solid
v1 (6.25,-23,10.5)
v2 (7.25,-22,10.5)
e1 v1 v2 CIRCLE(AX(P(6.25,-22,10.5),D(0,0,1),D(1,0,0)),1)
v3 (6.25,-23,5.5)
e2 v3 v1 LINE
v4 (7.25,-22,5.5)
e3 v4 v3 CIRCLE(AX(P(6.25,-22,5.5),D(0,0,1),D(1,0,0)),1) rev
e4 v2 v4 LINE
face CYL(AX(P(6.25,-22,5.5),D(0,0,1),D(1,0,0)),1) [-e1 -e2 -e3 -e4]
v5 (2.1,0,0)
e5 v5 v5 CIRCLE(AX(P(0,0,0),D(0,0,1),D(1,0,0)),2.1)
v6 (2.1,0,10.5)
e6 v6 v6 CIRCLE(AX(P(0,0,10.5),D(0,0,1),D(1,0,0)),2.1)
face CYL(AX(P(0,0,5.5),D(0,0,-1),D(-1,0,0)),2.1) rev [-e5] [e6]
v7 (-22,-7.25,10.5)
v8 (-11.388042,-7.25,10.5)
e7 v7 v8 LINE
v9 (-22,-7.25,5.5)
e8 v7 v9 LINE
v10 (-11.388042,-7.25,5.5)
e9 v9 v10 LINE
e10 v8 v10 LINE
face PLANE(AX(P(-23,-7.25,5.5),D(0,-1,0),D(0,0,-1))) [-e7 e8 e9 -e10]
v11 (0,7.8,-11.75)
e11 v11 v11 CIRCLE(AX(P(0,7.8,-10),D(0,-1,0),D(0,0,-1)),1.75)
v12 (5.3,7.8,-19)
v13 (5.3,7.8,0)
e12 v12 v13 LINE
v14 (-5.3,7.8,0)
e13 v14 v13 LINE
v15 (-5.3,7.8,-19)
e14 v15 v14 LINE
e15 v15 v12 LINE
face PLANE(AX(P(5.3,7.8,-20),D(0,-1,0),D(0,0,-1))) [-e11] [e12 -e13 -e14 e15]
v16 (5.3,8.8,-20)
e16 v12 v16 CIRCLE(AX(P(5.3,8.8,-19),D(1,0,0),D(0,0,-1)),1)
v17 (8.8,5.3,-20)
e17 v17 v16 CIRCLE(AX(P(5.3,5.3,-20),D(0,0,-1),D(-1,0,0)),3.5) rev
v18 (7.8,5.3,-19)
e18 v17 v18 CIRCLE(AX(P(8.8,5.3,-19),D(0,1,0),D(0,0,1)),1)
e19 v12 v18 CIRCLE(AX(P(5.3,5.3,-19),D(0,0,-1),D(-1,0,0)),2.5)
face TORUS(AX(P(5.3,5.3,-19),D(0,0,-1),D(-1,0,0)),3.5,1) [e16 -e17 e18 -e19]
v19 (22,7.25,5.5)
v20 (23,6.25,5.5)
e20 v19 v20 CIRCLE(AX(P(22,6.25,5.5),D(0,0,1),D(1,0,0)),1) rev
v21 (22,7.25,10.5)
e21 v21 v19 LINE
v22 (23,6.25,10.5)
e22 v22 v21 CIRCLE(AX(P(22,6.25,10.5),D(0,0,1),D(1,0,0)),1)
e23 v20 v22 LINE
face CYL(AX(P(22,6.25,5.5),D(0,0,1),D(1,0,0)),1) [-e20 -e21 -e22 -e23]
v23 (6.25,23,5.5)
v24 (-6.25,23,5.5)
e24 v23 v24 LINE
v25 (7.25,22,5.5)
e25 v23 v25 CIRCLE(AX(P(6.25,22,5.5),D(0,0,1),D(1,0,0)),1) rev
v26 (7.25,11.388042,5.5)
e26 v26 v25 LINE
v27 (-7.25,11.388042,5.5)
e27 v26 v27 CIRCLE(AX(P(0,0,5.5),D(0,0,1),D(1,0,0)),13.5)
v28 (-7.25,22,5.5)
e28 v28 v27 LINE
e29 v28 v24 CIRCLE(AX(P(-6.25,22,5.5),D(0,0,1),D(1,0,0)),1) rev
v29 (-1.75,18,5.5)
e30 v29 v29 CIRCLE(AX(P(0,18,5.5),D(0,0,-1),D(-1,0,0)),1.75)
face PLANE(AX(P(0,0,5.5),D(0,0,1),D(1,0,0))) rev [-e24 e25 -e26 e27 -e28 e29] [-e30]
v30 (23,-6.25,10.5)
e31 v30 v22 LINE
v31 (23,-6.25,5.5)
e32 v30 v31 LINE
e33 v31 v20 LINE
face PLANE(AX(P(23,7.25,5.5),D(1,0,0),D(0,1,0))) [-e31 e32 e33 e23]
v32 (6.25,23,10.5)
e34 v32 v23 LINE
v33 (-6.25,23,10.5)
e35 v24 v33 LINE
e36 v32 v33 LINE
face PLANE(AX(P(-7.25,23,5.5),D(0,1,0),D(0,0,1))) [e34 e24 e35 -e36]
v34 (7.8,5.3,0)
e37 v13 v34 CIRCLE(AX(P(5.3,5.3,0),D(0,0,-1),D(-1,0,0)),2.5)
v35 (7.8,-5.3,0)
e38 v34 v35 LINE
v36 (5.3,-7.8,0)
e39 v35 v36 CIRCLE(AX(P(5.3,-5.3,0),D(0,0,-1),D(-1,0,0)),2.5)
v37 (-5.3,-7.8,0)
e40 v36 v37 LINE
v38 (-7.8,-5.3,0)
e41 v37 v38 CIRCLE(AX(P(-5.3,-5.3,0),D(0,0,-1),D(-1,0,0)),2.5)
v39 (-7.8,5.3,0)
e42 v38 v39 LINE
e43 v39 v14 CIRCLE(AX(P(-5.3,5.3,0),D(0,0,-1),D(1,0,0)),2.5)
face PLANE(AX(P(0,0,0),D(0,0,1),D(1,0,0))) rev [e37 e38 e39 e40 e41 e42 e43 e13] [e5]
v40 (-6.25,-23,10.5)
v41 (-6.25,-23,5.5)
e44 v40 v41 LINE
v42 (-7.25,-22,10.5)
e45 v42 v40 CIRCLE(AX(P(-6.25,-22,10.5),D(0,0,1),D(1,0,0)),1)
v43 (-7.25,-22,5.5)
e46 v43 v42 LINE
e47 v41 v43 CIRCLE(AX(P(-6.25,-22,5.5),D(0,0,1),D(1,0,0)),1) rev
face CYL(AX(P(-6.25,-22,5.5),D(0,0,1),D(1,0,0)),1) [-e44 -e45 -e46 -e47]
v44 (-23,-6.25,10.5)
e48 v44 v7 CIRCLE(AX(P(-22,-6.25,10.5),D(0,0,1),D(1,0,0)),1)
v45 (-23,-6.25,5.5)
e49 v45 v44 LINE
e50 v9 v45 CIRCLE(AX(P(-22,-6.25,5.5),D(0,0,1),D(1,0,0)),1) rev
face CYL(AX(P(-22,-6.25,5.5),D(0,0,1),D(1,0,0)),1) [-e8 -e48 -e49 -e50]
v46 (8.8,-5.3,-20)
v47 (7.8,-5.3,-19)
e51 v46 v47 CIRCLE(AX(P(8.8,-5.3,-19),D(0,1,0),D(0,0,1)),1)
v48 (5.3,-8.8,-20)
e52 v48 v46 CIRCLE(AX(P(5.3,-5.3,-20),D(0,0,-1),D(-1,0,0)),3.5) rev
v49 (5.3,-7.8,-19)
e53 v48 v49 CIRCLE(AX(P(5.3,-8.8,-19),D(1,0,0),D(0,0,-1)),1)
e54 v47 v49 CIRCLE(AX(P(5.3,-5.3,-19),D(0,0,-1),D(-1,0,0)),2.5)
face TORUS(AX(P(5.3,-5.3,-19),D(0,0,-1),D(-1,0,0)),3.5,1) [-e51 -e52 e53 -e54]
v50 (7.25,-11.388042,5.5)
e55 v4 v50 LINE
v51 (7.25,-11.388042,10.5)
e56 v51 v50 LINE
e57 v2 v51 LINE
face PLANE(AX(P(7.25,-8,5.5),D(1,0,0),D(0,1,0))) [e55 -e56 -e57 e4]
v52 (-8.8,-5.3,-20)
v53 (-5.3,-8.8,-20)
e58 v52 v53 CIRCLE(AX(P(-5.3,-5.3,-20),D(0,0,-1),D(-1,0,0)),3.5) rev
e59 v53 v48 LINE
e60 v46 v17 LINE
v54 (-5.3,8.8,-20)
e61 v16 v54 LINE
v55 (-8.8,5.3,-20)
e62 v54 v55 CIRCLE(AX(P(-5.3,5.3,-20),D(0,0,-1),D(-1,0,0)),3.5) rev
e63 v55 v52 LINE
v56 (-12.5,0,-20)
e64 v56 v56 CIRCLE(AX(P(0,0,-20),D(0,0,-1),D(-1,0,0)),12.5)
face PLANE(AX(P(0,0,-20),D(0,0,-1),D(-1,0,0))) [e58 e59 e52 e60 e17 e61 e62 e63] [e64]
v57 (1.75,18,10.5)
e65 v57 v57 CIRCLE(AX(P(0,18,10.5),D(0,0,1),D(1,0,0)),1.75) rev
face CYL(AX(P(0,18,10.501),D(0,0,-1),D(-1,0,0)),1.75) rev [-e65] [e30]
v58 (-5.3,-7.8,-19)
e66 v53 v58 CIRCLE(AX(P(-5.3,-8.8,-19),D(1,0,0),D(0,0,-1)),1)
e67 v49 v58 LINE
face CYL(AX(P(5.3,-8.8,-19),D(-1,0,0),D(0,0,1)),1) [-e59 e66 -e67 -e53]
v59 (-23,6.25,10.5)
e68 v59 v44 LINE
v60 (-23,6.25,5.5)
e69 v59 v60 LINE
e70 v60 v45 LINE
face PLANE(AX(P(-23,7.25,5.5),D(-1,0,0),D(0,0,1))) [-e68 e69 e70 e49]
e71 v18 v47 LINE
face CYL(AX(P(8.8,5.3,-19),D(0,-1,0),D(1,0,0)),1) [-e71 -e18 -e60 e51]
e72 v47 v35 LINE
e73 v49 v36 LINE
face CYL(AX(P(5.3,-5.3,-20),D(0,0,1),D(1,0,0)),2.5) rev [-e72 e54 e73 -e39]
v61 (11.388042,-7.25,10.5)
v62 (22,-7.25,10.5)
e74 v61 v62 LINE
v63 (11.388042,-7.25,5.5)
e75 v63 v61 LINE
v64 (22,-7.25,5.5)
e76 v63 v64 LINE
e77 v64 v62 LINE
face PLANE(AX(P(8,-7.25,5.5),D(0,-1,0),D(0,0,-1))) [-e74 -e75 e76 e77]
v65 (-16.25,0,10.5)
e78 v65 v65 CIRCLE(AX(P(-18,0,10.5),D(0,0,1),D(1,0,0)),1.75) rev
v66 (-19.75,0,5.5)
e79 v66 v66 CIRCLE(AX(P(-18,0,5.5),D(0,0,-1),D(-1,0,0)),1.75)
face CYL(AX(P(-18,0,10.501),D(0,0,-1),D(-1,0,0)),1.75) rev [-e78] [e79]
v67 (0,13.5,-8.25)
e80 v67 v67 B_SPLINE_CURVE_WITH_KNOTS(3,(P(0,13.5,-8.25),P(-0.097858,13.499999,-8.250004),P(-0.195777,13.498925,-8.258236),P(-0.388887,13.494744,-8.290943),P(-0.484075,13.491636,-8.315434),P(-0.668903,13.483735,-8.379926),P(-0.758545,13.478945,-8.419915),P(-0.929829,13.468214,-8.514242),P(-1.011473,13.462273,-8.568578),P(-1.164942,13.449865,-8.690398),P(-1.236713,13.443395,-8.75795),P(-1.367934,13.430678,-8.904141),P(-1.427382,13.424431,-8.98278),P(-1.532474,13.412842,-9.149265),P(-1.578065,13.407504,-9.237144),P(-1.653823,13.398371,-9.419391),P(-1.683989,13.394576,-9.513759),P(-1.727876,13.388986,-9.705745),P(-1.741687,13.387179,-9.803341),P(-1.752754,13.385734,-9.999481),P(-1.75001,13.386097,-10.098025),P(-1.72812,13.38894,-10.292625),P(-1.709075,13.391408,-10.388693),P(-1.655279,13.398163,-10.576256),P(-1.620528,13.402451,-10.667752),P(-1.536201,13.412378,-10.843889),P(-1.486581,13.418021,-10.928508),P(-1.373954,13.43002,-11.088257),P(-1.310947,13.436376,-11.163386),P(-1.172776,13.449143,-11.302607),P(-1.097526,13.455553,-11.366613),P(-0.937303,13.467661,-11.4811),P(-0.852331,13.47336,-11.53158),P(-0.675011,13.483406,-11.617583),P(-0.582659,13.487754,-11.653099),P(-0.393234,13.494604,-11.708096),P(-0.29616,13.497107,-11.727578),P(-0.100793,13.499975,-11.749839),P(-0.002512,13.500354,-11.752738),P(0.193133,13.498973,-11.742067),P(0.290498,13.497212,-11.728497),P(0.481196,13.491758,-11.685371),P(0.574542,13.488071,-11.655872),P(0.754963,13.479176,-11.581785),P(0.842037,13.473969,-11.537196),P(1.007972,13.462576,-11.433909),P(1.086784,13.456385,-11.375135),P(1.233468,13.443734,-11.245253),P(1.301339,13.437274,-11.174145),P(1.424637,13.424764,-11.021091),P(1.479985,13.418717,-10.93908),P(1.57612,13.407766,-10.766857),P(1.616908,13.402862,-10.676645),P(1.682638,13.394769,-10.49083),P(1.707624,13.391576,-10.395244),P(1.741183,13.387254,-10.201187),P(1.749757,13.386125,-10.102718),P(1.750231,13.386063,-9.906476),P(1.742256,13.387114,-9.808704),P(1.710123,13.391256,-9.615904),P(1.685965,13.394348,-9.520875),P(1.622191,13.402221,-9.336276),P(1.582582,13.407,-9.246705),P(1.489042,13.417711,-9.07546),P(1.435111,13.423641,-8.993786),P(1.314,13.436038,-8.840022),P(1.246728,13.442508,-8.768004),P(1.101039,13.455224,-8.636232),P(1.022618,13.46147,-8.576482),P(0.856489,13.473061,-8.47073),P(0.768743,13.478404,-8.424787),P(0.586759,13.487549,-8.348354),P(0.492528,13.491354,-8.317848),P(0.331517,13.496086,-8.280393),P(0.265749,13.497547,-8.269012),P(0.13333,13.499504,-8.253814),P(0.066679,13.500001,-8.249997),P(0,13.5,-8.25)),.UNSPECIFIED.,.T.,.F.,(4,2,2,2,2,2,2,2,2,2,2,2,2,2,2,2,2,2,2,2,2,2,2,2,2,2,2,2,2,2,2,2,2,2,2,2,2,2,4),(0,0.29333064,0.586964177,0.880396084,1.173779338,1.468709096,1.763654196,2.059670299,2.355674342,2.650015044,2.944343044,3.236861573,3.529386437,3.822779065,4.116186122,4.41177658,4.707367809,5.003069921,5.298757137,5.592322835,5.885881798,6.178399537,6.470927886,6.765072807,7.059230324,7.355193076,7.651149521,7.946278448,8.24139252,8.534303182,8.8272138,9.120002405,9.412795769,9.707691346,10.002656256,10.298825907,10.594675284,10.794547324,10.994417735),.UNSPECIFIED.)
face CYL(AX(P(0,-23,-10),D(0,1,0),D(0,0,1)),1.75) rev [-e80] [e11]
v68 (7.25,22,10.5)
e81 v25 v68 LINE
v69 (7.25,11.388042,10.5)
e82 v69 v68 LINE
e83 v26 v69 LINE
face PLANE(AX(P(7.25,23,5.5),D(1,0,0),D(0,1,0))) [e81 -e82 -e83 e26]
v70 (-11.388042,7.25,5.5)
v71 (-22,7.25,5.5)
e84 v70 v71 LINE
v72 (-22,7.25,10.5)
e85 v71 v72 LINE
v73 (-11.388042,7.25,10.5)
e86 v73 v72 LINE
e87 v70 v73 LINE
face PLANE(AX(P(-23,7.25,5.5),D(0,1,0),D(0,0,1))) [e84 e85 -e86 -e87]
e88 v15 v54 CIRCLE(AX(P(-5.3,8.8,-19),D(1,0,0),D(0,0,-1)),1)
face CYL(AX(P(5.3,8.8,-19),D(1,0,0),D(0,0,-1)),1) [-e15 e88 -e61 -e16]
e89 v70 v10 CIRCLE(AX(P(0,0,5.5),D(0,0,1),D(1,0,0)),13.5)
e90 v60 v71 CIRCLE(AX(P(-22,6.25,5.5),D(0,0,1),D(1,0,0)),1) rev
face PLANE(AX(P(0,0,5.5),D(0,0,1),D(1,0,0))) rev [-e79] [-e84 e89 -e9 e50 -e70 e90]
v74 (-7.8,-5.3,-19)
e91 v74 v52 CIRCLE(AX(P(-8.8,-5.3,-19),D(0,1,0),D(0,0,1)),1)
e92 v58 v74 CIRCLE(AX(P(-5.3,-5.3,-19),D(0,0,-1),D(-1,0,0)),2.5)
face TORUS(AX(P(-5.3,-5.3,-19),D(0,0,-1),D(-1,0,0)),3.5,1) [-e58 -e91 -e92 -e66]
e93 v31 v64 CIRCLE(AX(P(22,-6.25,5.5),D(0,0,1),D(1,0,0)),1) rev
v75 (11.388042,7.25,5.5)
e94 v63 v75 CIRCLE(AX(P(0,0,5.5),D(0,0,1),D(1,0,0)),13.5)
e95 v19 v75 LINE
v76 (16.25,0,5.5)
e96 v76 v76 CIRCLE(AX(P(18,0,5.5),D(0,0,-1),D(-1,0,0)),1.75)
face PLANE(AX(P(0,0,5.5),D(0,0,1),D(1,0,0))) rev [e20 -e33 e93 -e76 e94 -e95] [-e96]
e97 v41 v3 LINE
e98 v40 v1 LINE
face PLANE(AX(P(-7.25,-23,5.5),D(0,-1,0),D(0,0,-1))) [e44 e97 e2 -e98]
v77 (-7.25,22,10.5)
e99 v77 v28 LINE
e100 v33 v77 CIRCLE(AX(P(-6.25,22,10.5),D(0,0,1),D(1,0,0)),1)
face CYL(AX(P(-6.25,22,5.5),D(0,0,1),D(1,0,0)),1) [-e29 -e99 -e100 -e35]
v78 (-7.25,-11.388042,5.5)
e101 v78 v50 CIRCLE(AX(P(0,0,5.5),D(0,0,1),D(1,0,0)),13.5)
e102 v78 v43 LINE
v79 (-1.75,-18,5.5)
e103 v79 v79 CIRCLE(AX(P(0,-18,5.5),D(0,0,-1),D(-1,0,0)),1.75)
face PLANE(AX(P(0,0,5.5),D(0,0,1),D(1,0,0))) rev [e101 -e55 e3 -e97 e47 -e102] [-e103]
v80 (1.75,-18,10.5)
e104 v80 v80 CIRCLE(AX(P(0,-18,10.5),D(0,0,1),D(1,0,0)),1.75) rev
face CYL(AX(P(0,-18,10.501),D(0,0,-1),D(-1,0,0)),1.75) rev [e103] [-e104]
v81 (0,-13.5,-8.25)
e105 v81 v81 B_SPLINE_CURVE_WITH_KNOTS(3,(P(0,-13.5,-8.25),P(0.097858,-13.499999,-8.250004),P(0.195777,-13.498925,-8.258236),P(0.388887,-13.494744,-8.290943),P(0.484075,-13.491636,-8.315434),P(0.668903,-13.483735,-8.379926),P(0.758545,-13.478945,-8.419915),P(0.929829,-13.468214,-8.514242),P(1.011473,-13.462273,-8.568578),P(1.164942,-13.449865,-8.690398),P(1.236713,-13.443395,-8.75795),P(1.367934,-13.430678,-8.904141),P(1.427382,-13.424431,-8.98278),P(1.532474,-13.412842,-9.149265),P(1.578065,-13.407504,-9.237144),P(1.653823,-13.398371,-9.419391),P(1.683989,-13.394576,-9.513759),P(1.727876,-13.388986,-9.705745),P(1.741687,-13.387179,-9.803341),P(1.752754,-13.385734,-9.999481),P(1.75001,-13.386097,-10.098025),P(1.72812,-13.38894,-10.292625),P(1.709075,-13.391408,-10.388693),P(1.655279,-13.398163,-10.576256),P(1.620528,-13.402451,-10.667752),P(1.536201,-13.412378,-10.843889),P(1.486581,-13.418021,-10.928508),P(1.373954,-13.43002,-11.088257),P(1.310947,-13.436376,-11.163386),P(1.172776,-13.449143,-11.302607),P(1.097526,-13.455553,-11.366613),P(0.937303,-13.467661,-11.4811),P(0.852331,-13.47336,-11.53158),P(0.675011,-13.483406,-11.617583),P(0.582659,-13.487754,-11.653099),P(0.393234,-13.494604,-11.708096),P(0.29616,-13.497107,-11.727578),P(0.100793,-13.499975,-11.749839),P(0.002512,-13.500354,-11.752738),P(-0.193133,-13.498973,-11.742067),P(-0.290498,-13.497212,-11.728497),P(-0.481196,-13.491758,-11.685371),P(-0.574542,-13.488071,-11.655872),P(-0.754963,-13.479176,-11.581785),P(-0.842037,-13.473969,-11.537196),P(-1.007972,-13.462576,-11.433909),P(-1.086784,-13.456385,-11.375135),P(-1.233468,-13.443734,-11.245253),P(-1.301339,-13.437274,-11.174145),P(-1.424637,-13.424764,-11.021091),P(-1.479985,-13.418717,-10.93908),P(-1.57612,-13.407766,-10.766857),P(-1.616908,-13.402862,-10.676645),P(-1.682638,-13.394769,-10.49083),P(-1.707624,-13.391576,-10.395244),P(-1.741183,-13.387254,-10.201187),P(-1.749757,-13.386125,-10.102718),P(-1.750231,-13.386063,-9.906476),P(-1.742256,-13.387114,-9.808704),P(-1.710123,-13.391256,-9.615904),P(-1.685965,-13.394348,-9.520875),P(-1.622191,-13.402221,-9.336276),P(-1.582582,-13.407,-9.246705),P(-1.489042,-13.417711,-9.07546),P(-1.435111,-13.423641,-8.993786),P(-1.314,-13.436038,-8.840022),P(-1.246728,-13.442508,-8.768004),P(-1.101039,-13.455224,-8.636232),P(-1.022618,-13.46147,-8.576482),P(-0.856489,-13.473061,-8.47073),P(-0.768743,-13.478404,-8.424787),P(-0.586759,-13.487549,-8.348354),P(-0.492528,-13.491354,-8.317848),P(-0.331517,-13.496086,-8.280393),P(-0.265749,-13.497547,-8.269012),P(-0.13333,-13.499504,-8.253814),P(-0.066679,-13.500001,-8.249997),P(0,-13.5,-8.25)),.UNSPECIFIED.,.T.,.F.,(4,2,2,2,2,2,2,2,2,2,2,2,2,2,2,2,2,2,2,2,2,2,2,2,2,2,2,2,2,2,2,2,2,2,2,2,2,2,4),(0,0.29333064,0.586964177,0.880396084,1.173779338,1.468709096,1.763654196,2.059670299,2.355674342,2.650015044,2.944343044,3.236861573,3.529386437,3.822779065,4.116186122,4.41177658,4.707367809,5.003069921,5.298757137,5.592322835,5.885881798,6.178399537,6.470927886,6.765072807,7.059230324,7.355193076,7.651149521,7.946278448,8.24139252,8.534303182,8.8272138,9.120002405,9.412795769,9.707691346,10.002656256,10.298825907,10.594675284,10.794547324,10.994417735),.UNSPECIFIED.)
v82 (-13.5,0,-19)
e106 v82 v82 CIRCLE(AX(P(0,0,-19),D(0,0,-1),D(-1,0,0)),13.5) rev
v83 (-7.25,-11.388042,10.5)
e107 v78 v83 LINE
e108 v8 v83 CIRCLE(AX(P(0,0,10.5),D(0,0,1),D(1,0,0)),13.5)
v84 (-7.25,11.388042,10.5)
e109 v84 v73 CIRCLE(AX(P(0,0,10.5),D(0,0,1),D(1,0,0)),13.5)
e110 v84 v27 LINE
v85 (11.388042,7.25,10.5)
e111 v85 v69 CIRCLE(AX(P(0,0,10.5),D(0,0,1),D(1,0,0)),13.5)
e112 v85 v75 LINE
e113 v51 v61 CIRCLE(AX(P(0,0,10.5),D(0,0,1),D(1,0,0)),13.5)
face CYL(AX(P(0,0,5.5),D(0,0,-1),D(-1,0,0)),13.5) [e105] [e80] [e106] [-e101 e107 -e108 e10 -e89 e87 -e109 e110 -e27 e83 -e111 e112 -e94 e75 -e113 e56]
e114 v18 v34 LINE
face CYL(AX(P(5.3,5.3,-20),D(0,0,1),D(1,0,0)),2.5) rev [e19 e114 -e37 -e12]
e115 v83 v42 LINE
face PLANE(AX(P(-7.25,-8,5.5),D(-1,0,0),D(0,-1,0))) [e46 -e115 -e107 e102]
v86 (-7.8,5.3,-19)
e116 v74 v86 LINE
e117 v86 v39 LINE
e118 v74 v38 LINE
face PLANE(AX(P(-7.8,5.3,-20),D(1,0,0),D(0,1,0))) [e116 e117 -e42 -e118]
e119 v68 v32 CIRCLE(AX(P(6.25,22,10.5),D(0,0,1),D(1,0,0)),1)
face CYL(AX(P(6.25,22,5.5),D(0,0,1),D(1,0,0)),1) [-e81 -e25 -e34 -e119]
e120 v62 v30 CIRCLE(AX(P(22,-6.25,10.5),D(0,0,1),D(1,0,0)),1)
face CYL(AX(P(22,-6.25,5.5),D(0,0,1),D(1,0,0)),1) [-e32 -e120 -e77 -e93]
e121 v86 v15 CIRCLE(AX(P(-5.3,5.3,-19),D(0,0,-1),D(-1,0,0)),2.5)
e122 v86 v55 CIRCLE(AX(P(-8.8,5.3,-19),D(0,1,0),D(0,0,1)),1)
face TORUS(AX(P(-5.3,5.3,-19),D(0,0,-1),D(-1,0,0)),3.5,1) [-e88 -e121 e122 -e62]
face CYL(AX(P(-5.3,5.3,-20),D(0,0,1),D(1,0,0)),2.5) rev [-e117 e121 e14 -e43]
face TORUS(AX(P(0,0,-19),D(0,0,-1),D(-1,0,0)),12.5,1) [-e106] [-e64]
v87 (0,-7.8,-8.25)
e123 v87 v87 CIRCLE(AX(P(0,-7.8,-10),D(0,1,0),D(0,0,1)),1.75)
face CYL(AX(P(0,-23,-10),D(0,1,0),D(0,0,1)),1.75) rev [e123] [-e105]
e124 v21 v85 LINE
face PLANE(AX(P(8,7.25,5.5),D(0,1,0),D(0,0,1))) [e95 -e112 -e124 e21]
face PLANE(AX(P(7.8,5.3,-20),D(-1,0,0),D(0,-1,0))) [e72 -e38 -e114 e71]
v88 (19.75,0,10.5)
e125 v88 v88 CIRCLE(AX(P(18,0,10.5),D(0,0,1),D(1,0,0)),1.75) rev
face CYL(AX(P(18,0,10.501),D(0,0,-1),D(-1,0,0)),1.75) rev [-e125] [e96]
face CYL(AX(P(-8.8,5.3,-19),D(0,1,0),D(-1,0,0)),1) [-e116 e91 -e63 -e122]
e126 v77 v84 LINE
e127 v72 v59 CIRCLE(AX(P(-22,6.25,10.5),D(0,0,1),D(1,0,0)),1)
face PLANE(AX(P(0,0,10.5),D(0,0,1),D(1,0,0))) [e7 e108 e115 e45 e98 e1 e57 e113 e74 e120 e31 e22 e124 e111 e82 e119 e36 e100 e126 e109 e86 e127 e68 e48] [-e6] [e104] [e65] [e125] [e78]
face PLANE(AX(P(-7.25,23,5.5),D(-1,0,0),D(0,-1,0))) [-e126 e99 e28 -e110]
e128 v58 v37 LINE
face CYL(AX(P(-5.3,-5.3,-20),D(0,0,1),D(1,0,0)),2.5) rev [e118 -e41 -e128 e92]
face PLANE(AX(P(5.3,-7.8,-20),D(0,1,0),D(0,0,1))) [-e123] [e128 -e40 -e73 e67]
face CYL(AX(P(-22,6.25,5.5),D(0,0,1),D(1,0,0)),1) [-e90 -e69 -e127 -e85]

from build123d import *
from build123d.topology import SkipClean

# Parameters (mm, degrees)
SKETCH1_R               = 13.5
SKETCH1_R_2             = 2.1
BOSS_EXTRUDE1_DEPTH     = 5.5
SKETCH2_R               = 13.5
SKETCH2_R_2             = 2.1
BOSS_EXTRUDE2_DEPTH     = 5
SKETCH4_W               = 14.5
SKETCH4_H               = 15
SKETCH4_W_2             = 15
SKETCH4_H_2             = 14.5
BOSS_EXTRUDE4_DEPTH     = 5
CUT_EXTRUDE1_REACH      = 34.989
SKETCH5_R               = 1.75
BOSS_EXTRUDE5_START     = 20
SKETCH6_R               = 13.5
BOSS_EXTRUDE5_DEPTH     = 20
CUT_EXTRUDE2_DEPTH      = 39.183766184
CUT_EXTRUDE2_DEPTH_BACK = 39.183766184
SKETCH7_R               = 1.75
FILLET5_R               = 1
FILLET6_R               = 1


with BuildPart() as part:
    # Sketch1 → Boss-Extrude1 (new body)
    with BuildSketch(Plane.XY):
        Circle(SKETCH1_R)
        Circle(SKETCH1_R_2, mode=Mode.SUBTRACT)
    extrude(amount=BOSS_EXTRUDE1_DEPTH)

    # Sketch2 → Boss-Extrude2 (add)
    with BuildSketch(Plane.XY.offset(5.5)):
        Circle(SKETCH2_R)
        Circle(SKETCH2_R_2, mode=Mode.SUBTRACT)
    extrude(amount=BOSS_EXTRUDE2_DEPTH)

    # Sketch4 → Boss-Extrude4 (add)
    with BuildSketch(Plane.XY.offset(10.5)):
        with Locations((0, 15.5)):
            Rectangle(SKETCH4_W, SKETCH4_H)
        with Locations((15.5, 0)):
            Rectangle(SKETCH4_W_2, SKETCH4_H_2)
        with Locations((-15.5, 0)):
            Rectangle(SKETCH4_W_2, SKETCH4_H_2)
        with Locations((0, -15.5)):
            Rectangle(SKETCH4_W, SKETCH4_H)
    extrude(amount=-BOSS_EXTRUDE4_DEPTH)

    # Sketch5 → Cut-Extrude1 (cut, up to next)
    with BuildSketch(Plane(origin=(0, 0, 5.5), x_dir=(-1, 0, 0), z_dir=(0, 0, -1)), mode=Mode.PRIVATE) as cut_extrude1_sk1:
        with Locations((18, 0)):
            Circle(SKETCH5_R)
    cut_extrude1_tool1 = extrude(cut_extrude1_sk1.sketch, amount=-CUT_EXTRUDE1_REACH, mode=Mode.PRIVATE) & part.part
    # Sketch5 → Cut-Extrude1 (cut, up to next)
    with BuildSketch(Plane(origin=(0, 0, 5.5), x_dir=(-1, 0, 0), z_dir=(0, 0, -1)), mode=Mode.PRIVATE) as cut_extrude1_sk2:
        with Locations((-18, 0)):
            Circle(SKETCH5_R)
    cut_extrude1_tool2 = extrude(cut_extrude1_sk2.sketch, amount=-CUT_EXTRUDE1_REACH, mode=Mode.PRIVATE) & part.part
    # Sketch5 → Cut-Extrude1 (cut, up to next)
    with BuildSketch(Plane(origin=(0, 0, 5.5), x_dir=(-1, 0, 0), z_dir=(0, 0, -1)), mode=Mode.PRIVATE) as cut_extrude1_sk3:
        with Locations((0, 18)):
            Circle(SKETCH5_R)
    cut_extrude1_tool3 = extrude(cut_extrude1_sk3.sketch, amount=-CUT_EXTRUDE1_REACH, mode=Mode.PRIVATE) & part.part
    # Sketch5 → Cut-Extrude1 (cut, up to next)
    with BuildSketch(Plane(origin=(0, 0, 5.5), x_dir=(-1, 0, 0), z_dir=(0, 0, -1)), mode=Mode.PRIVATE) as cut_extrude1_sk4:
        with Locations((0, -18)):
            Circle(SKETCH5_R)
    cut_extrude1_tool4 = extrude(cut_extrude1_sk4.sketch, amount=-CUT_EXTRUDE1_REACH, mode=Mode.PRIVATE) & part.part
    add(cut_extrude1_tool1.solids().sort_by_distance((-18, 0, 5.5))[0], mode=Mode.SUBTRACT)
    add(cut_extrude1_tool2.solids().sort_by_distance((18, 0, 5.5))[0], mode=Mode.SUBTRACT)
    add(cut_extrude1_tool3.solids().sort_by_distance((0, 18, 5.5))[0], mode=Mode.SUBTRACT)
    add(cut_extrude1_tool4.solids().sort_by_distance((0, -18, 5.5))[0], mode=Mode.SUBTRACT)

    # Sketch6 → Boss-Extrude5 (add)
    with SkipClean():  # the faces are left unmerged after this step: merging them gives an invalid solid
        with BuildSketch(Plane(origin=(0, 0, 0), x_dir=(-1, 0, 0), z_dir=(0, 0, -1)).offset(BOSS_EXTRUDE5_START)):
            Circle(SKETCH6_R)
            with BuildLine():
                Line((-5.3, 7.8), (5.3, 7.8))
                ThreePointArc((5.3, 7.8), (7.067766953, 7.067766953), (7.8, 5.3))
                Line((7.8, 5.3), (7.8, -5.3))
                ThreePointArc((7.8, -5.3), (7.067766953, -7.067766953), (5.3, -7.8))
                Line((5.3, -7.8), (-5.3, -7.8))
                ThreePointArc((-5.3, -7.8), (-7.067766953, -7.067766953), (-7.8, -5.3))
                Line((-7.8, -5.3), (-7.8, 5.3))
                ThreePointArc((-7.8, 5.3), (-7.067766953, 7.067766953), (-5.3, 7.8))
            make_face(mode=Mode.SUBTRACT)
        extrude(amount=-BOSS_EXTRUDE5_DEPTH)

    # Sketch7 → Cut-Extrude2 (cut, two sides: drawn at the far end of the back side and taken through both)
    with SkipClean():  # the faces are left unmerged after this step: merging them gives an invalid solid
        with BuildSketch(Plane(origin=(0, 0, 0), x_dir=(1, 0, 0), z_dir=(0, 1, 0)).offset(-CUT_EXTRUDE2_DEPTH_BACK)):
            with Locations((0, 10)):
                Circle(SKETCH7_R)
        extrude(amount=CUT_EXTRUDE2_DEPTH + CUT_EXTRUDE2_DEPTH_BACK, mode=Mode.SUBTRACT)

    # Fillet5
    fillet5_edges = [part.edges().sort_by_distance(p)[0] for p in [
        (7.067766953, 7.067766953, -20),
        (0, 7.8, -20),
        (-7.067766953, 7.067766953, -20),
        (-7.8, 0, -20),
        (-7.067766953, -7.067766953, -20),
        (0, -7.8, -20),
        (7.067766953, -7.067766953, -20),
        (7.8, 0, -20),
        (13.5, 0, -20),
    ]]
    fillet(fillet5_edges, radius=FILLET5_R)

    # Fillet6
    fillet6_edges = [part.edges().sort_by_distance(p)[0] for p in [
        (-23, 7.25, 8),
        (-23, -7.25, 8),
        (-7.25, -23, 8),
        (7.25, -23, 8),
        (23, -7.25, 8),
        (-7.25, 23, 8),
        (7.25, 23, 8),
        (23, 7.25, 8),
    ]]
    fillet(fillet6_edges, radius=FILLET6_R)


solid = part.part
